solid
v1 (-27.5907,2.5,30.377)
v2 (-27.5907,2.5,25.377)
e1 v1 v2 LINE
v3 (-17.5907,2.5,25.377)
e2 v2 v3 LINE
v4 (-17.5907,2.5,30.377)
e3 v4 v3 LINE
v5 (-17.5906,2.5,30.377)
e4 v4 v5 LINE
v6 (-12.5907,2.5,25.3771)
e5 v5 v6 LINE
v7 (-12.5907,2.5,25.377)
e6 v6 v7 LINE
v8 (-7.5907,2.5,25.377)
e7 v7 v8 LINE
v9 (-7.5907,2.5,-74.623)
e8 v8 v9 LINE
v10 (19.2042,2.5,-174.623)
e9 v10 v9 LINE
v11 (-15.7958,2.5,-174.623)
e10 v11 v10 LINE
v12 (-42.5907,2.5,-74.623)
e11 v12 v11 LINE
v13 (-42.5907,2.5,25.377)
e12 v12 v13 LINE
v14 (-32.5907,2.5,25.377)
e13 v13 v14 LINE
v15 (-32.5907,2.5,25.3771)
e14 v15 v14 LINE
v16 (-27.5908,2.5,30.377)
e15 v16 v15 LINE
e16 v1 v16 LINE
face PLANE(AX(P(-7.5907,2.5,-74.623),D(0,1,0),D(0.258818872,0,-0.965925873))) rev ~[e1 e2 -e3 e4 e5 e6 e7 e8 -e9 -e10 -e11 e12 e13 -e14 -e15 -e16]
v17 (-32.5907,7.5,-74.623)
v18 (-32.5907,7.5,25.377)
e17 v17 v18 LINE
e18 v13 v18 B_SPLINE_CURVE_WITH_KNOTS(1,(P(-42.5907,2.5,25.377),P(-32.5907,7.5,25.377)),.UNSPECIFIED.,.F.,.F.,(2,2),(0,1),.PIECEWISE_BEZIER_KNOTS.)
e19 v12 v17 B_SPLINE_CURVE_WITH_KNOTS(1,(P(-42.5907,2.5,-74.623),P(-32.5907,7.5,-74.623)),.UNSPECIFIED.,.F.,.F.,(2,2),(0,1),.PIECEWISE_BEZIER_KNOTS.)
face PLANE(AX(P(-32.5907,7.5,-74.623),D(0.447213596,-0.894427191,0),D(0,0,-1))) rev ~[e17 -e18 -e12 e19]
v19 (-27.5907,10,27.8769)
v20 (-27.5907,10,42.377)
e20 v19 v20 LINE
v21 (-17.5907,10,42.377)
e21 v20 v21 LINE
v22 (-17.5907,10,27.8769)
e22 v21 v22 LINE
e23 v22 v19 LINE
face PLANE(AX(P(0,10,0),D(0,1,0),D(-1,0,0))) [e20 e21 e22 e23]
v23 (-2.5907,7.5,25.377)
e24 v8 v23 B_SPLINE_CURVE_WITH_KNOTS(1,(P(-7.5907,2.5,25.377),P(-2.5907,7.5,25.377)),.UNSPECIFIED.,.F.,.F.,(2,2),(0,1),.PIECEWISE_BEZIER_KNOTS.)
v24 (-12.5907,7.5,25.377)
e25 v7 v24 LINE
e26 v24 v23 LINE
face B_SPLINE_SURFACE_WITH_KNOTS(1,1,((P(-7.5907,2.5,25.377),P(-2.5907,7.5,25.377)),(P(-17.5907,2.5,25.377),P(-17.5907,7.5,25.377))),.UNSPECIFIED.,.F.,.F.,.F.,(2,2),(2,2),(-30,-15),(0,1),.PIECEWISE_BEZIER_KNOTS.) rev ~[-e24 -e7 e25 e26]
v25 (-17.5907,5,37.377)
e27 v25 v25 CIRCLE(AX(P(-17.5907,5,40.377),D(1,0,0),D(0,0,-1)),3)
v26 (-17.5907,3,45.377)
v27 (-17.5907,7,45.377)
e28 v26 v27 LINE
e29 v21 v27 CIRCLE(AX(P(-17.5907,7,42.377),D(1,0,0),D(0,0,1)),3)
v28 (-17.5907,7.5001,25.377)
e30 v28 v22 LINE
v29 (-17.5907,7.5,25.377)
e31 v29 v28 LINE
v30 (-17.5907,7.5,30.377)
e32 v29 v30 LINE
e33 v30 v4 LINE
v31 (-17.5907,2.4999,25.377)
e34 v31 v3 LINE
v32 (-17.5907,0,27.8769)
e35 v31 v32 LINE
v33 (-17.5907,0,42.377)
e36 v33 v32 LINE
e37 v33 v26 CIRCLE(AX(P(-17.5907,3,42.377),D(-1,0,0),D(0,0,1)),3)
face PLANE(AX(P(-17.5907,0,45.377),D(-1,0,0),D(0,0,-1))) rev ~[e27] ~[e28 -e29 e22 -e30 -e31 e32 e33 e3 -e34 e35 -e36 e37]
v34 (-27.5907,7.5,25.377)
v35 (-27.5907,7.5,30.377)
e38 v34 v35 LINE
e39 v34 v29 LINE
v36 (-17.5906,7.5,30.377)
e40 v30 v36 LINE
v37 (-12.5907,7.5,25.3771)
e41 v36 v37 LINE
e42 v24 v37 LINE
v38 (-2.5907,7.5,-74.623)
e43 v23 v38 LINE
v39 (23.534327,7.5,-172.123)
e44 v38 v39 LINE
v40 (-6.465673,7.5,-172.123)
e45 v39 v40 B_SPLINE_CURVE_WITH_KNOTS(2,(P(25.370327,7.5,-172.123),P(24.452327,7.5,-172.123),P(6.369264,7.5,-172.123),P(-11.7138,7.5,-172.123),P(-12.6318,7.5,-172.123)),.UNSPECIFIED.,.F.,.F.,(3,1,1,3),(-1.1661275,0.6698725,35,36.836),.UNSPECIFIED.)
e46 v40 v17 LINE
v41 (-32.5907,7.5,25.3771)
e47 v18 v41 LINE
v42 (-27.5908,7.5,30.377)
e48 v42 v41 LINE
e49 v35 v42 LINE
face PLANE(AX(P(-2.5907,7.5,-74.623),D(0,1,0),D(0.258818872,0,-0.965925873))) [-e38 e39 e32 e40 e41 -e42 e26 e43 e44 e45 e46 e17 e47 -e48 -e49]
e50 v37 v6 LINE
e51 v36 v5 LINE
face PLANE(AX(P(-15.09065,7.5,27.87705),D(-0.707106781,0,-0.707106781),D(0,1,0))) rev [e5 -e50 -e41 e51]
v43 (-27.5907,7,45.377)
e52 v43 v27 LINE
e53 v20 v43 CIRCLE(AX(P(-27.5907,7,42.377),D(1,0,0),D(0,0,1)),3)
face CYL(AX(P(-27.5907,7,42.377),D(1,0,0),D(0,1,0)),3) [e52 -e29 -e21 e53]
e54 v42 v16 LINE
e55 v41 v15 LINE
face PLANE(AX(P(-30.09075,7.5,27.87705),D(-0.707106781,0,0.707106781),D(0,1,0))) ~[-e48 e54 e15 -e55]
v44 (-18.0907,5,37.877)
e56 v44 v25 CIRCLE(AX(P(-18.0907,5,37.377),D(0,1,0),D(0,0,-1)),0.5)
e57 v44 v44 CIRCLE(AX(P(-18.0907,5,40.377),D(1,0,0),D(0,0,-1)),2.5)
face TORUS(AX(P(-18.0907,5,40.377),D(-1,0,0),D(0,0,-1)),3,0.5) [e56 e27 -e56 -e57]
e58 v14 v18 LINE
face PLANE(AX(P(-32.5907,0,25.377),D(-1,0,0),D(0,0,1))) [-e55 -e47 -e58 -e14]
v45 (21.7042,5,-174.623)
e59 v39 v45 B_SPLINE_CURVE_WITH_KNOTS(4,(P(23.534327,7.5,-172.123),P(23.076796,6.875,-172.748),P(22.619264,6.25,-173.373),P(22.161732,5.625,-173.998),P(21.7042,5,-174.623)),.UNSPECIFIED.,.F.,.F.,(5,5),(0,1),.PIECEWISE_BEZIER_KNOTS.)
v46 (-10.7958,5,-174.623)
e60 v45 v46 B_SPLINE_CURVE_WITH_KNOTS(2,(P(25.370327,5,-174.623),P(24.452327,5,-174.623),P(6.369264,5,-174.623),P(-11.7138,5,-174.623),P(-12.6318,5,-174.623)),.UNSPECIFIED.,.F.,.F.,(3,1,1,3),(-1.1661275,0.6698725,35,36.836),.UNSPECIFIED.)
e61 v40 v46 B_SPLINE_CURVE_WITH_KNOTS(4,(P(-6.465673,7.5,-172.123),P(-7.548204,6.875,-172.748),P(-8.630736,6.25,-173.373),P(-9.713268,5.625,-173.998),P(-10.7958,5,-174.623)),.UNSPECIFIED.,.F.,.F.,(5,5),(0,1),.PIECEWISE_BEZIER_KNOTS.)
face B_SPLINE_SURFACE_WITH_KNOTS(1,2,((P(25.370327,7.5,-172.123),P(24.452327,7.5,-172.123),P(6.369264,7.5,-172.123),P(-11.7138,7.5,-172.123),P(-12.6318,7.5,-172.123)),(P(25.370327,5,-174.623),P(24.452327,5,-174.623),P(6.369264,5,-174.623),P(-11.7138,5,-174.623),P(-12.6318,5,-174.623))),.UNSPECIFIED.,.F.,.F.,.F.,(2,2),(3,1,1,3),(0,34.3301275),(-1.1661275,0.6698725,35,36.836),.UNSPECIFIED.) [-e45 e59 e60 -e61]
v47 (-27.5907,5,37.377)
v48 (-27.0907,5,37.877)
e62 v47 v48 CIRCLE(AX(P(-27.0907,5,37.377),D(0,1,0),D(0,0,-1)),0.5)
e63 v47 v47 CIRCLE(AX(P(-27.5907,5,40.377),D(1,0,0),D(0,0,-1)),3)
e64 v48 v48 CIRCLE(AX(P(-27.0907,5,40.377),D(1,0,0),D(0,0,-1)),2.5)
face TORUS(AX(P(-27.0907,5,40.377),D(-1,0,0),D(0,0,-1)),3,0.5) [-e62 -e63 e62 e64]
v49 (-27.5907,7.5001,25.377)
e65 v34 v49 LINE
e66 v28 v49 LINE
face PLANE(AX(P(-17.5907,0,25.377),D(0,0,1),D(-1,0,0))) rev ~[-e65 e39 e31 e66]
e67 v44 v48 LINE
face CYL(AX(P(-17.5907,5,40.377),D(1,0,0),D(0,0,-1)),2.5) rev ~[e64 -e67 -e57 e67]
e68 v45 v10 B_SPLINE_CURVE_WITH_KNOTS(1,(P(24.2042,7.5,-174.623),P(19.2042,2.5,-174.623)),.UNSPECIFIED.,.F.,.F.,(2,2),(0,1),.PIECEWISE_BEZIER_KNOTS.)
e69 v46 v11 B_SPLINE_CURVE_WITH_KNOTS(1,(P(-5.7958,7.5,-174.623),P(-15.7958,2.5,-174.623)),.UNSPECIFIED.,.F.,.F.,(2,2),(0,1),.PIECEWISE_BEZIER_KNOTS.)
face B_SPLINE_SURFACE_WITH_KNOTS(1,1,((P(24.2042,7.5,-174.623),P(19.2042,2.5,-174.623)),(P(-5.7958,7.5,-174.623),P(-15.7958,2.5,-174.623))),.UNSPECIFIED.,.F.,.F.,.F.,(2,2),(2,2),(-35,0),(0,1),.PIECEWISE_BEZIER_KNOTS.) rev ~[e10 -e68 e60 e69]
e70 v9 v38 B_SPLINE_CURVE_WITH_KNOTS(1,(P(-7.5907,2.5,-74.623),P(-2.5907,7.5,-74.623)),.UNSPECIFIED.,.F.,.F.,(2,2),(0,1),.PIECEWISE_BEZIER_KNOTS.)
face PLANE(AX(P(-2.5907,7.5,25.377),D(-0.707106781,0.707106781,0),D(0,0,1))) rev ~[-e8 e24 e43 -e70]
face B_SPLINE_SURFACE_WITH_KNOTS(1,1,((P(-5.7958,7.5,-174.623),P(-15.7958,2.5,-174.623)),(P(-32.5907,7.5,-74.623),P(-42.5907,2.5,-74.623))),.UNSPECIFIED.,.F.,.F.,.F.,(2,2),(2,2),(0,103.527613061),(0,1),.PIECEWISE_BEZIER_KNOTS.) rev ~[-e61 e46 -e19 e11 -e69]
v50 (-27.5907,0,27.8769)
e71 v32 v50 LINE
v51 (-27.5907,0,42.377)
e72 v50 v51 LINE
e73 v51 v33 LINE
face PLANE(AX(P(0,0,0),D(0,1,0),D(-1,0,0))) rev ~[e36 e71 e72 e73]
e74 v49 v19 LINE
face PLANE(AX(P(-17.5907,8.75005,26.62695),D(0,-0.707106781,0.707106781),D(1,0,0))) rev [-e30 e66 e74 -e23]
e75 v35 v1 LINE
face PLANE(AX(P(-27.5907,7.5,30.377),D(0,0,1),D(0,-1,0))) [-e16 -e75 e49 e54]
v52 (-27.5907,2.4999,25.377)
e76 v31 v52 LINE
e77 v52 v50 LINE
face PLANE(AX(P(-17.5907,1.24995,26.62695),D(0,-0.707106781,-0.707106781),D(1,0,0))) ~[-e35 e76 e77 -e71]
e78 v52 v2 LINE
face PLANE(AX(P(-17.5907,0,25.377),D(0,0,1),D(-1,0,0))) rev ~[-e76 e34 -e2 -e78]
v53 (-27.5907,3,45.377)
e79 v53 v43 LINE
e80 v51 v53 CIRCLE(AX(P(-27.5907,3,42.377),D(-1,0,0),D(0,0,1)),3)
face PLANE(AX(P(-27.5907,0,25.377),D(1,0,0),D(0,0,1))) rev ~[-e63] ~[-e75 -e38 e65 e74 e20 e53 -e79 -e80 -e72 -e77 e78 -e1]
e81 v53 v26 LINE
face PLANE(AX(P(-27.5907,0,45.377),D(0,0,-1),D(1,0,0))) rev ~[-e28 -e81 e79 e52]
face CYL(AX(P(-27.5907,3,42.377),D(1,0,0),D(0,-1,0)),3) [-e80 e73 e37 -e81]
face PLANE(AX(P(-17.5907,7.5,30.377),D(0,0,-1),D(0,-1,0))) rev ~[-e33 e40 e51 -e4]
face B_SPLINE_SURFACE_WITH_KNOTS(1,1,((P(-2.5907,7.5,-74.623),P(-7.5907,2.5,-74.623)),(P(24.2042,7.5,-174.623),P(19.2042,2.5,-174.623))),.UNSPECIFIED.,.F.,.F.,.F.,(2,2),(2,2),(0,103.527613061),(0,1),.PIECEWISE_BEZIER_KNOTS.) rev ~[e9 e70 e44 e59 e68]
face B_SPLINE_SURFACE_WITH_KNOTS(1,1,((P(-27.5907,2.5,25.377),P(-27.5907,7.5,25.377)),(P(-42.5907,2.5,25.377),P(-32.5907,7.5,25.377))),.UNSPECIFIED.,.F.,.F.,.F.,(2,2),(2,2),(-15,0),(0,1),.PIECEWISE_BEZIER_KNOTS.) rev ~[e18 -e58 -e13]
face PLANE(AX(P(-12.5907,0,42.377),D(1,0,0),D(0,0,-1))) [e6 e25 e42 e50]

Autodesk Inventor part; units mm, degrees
ref_plane "YZ Plane" through (0, 0, 0) normal (1, 0, 0) x (0, 1, 0)
sketch "Sketch1" plane through (0, 0, 0) normal (0, 1, 0) x (-1, 0, 0)
  line L0 (27.5907, 45.377) -> (17.5907, 45.377)
  line L1 (17.5907, 45.377) -> (17.5907, 25.377)
  line L2 (17.5907, 25.377) -> (27.5907, 25.377)
  line L3 (27.5907, 25.377) -> (27.5907, 45.377)
  dimension "d0" = 10
  dimension "d1" = 20
extrude "Extrusion1" add sketch "Sketch1" along normal blind 10
sketch "Sketch2" plane through (-17.5907, 0, 45.377) normal (1, 0, 0) x (0, 0, -1)
  line L0 (0, 10) -> (20, 10) construction
  line L1 (0, 10) -> (10, 10) construction
  line L2 (10, 10) -> (10, 0) construction
  line L3 (10, 0) -> (0, 0) construction
  line L4 (0, 0) -> (0, 10) construction
  line L5 (20, 0) -> (20, 10) construction
  line L6 (0, 10) -> (10, 0) construction
  line L7 (0, 0) -> (20, 0) construction
  line L8 (10, 10) -> (0, 0) construction
  circle A0 centre (5, 5) radius 2.5
  point P0 (45.377, 0)
  dimension "d4" = 5
extrude "Extrusion2" cut sketch "Sketch2" against normal through all
fillet "Fillet1" radius 0.5 2 edges at (-17.5907, 5, 42.877) (-27.5907, 5, 42.877)
fillet "Fillet2" radius 3 2 edges at (-22.5907, 10, 45.377) (-22.5907, 0, 45.377)
ref_plane "Work Plane1" through (0, 7.5, 0) normal (0, 1, 0) x (1, 0, 0)
ref_plane "Work Plane2" through (0, 2.5, 0) normal (0, -1, 0) x (1, 0, 0)
sketch "Sketch7" plane through (0, 7.5, 0) normal (0, 1, 0) x (1, 0, 0)
  line L0 (-32.5907, -25.377) -> (-2.5907, -25.377)
  line L1 (-2.5907, -25.377) -> (-2.5907, 74.623)
  line L2 (-2.5907, 74.623) -> (-32.5907, 74.623)
  line L3 (-32.5907, 74.623) -> (-32.5907, -25.377)
  line L4 (-17.5907, -25.377) -> (-27.5907, -25.377) projected
  line L5 (-27.5907, -25.377) -> (-27.5907, -42.377) projected
  line L6 (-17.5907, -42.377) -> (-17.5907, -25.377) projected
  point P0 (0, 0)
  dimension "d30" = 0
  dimension "d31" = 5
  dimension "d32" = 15
  dimension "d33" = 100
sketch "Sketch8" plane through (0, 2.5, 0) normal (0, -1, 0) x (1, 0, 0)
  line L0 (-42.5907, 25.377) -> (-7.5907, 25.377)
  line L1 (-7.5907, 25.377) -> (-7.5907, -74.623)
  line L2 (-7.5907, -74.623) -> (-42.5907, -74.623)
  line L3 (-42.5907, -74.623) -> (-42.5907, 25.377)
  line L4 (-17.5907, 25.377) -> (-27.5907, 25.377) projected
  line L5 (-27.5907, 25.377) -> (-27.5907, 42.377) projected
  line L6 (-17.5907, 42.377) -> (-17.5907, 25.377) projected
  point P0 (0, 0)
  dimension "d34" = 0
  dimension "d35" = 15
  dimension "d36" = 10
  dimension "d37" = 100
loft "Loft4" add profiles "Sketch8", "Sketch7"
sketch "Sketch9" plane through (-17.5907, 0, 42.377) normal (1, 0, 0) x (0, 0, -1)
  line L0 (17, 7.5) -> (17, 10) projected
  line L1 (17, 7.5) -> (12, 7.5)
  line L2 (12, 7.5) -> (12, 2.5)
  line L3 (12, 2.5) -> (17, 2.5)
  line L4 (17, 2.5) -> (17, 7.5)
  line L5 (17, 0) -> (17, 2.5) projected
  point P0 (42.377, 0)
  dimension "d42" = 5
sketch "Sketch10" plane through (-27.5907, 0, 25.377) normal (-1, 0, 0) x (0, 0, 1)
  line L0 (0, 2.5) -> (0, 7.5) projected
  line L1 (0, 7.5) -> (5, 7.5)
  line L2 (5, 7.5) -> (5, 2.5)
  line L3 (5, 2.5) -> (0, 2.5)
  line L4 (0, 2.5) -> (0, 7.5)
  point P0 (-25.377, 0)
  dimension "d43" = 5
extrude "Extrusion3" add sketch "Sketch10" along normal blind 5
extrude "Extrusion4" add sketch "Sketch9" along normal blind 5
chamfer "Chamfer1" distance 5 angle 45 2 edges at (-12.5907, 5, 30.377) (-32.5907, 5, 30.377)
sketch "Sketch11" plane through (-32.5907, 7.5, -74.623) normal (0, 1, 0) x (1, 0, 0)
  line L0 (30, 0) -> (0, 0) projected
  line L1 (30, 0) -> (56.7949, 100)
  line L2 (56.7949, 100) -> (26.7949, 100)
  line L3 (26.7949, 100) -> (0, 0)
  line L4 (30, -100) -> (30, 0) projected
  point P0 (32.5907, -74.623)
  dimension "d52" = 15
  dimension "d53" = 100
sketch "Sketch12" plane through (-42.5907, 2.5, -74.623) normal (0, -1, 0) x (1, 0, 0)
  line L0 (35, 0) -> (0, 0) projected
  line L1 (0, 0) -> (26.7949, -100)
  line L2 (26.7949, -100) -> (61.7949, -100)
  line L3 (61.7949, -100) -> (35, 0)
  line L4 (0, 0) -> (0, 100) projected
  point P0 (42.5907, 74.623)
  dimension "d54" = 100
  dimension "d55" = 15
loft "Loft5" add profiles "Sketch11", "Sketch12"
chamfer "Chamfer2" distance 2.5 angle 45 2 edges at (-22.5907, 0, 25.377) (-22.5907, 10, 25.377)
chamfer "Chamfer3" distance 2.5 angle 45 1 edges at (9.2042, 7.5, -174.623)
equation "\"d35\" = d32"
equation "\"d37\" = d33"
equation "\"d43\" = d42"
equation "\"d54\" = d53"
equation "\"d55\" = d52"
properties part number "Gyrocopter Blade"
